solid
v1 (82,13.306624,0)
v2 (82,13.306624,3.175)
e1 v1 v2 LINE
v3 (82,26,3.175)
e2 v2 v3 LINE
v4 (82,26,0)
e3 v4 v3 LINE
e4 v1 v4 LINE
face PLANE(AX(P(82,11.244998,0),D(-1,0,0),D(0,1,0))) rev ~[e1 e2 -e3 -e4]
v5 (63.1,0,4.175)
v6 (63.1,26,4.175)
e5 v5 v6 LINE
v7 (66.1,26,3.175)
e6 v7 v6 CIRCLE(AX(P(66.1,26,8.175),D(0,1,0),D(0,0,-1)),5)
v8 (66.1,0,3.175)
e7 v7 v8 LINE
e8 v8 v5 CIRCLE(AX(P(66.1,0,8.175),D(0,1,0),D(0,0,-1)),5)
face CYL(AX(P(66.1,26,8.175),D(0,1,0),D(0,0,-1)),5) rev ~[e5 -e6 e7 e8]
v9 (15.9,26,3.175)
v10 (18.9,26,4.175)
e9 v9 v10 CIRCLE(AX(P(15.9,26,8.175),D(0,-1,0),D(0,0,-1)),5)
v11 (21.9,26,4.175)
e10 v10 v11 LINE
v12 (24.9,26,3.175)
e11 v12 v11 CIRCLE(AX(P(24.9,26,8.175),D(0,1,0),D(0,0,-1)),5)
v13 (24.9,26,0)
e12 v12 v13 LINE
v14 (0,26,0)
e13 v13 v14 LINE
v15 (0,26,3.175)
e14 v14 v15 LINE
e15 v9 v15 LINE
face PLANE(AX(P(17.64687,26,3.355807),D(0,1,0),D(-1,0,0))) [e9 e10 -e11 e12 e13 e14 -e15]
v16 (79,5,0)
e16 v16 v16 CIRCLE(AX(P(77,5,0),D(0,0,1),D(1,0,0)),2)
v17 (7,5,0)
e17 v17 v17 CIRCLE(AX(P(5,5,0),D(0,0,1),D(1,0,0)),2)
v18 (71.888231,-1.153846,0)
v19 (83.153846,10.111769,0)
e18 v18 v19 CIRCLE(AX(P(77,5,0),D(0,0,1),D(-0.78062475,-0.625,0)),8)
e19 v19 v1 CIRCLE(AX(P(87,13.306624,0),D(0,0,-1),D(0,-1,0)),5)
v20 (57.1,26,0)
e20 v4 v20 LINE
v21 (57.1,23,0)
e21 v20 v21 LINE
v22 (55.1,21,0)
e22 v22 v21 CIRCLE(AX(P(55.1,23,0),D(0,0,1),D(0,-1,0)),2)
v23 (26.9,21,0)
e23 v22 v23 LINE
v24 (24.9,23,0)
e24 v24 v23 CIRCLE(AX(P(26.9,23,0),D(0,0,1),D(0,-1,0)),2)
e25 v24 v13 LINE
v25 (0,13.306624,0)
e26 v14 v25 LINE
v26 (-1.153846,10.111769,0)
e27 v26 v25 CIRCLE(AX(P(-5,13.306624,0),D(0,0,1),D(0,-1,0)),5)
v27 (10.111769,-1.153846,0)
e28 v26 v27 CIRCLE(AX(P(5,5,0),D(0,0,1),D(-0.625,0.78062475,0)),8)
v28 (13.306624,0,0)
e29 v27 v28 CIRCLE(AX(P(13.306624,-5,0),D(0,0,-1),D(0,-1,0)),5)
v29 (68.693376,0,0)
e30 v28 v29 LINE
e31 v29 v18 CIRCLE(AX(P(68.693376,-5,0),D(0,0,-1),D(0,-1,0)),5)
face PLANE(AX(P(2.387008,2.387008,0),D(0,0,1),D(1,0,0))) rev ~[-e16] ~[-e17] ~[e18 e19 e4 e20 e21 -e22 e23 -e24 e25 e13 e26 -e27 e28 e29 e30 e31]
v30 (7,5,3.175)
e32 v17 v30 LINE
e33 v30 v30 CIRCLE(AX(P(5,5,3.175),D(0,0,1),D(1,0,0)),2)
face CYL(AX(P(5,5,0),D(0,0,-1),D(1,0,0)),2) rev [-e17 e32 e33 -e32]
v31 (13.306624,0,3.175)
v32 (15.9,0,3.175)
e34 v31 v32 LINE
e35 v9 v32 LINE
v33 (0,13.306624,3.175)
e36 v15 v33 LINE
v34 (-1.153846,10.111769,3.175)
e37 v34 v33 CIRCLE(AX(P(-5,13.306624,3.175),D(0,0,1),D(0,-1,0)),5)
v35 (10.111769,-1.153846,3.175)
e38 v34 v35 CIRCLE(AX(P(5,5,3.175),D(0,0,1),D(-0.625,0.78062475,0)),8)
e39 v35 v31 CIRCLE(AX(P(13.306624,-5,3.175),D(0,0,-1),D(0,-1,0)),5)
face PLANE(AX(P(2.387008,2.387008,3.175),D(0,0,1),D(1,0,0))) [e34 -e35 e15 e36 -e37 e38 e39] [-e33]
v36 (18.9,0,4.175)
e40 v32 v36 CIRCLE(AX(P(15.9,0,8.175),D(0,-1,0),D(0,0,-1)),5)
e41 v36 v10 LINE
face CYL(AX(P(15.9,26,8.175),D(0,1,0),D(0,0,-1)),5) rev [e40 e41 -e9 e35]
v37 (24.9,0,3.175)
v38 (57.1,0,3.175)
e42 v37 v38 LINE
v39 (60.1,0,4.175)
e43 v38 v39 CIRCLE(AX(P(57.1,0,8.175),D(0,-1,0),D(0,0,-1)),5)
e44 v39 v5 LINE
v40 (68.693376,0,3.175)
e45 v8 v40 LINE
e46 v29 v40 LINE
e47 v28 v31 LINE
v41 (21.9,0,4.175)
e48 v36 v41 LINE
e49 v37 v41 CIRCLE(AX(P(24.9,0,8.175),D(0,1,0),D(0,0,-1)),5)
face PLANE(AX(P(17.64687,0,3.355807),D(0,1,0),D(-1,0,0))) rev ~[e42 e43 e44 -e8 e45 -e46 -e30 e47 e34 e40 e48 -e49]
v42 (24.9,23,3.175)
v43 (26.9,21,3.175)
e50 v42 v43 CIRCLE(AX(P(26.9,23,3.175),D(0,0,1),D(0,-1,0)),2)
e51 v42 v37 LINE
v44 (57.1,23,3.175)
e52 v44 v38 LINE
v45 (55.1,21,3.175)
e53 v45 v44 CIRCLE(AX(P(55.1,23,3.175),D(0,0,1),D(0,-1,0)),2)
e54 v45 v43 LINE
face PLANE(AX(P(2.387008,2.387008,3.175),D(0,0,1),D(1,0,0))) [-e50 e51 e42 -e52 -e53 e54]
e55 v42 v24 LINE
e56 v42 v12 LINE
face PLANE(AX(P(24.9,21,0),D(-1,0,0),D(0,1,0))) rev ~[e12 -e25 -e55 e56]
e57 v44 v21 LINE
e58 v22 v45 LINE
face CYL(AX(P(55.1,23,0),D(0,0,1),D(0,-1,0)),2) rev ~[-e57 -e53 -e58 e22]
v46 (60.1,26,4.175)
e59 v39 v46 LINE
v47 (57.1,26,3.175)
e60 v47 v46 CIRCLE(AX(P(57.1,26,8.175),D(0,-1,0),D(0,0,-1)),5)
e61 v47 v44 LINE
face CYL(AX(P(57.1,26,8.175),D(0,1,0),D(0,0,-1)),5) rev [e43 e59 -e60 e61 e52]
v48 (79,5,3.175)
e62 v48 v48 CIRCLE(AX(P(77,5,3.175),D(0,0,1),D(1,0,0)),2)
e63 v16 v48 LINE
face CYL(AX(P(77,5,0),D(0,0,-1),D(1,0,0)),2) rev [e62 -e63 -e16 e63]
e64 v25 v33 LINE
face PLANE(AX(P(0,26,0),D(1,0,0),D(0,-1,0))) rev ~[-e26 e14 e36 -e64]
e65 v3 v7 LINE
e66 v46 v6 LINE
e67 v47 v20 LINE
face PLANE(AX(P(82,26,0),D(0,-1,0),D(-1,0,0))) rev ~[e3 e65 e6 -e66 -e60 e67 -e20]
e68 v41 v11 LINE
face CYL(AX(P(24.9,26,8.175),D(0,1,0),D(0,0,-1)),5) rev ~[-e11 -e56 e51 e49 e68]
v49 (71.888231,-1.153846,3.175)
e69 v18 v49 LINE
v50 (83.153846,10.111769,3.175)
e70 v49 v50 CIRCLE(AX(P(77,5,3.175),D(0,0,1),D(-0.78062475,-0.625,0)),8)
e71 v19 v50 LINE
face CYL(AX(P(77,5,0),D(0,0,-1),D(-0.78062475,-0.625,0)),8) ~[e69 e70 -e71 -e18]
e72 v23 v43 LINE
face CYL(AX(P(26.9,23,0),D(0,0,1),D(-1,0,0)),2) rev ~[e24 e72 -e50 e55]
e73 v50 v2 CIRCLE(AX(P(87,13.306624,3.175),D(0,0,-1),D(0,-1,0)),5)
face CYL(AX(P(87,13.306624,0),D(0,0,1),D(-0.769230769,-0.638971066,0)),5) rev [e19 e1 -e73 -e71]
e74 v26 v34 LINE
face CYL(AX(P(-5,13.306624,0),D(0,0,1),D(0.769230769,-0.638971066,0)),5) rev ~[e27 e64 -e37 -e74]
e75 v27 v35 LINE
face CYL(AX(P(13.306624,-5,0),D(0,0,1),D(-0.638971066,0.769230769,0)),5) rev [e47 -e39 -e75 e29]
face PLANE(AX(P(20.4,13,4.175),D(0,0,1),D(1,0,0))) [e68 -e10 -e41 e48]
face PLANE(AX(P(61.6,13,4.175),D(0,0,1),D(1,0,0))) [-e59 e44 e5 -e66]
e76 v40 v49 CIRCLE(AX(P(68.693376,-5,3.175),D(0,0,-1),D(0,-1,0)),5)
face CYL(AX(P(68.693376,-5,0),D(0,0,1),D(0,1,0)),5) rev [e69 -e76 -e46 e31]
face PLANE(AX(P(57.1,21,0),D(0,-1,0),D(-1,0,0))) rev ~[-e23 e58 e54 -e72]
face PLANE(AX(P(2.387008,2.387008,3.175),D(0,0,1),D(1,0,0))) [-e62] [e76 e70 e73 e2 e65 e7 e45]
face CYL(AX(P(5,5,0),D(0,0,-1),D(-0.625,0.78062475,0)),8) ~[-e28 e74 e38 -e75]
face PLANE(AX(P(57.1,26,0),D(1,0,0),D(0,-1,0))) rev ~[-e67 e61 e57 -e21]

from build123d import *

# Parameters (mm, degrees)
F0_R        = 2
F1_DEPTH    = 3.175
F2_R        = 5
F3_R        = 2
F4_W        = 3
F4_H        = 26
F5_DEPTH    = 1
F6_T1_DEPTH = 26


# Not quite as in the source:
# - a fillet or chamfer that OpenCascade refuses, or shapes differently, is made with other operations: its cross-section is extruded or revolved along the edge and cut away or added


with BuildPart() as f1:
    # F0 (on Top) → F1 (new body)
    with BuildSketch(Plane.XY):
        with BuildLine():
            Line((11.2449979984, 0), (0, 0))
            Line((0, 0), (0, 11.2449979984))
            ThreePointArc((0, 11.2449979984), (-0.6568542495, -0.6568542495), (11.2449979984, 0))
        make_face()
        Polygon((0, 11.2449979984), (0, 0), (11.2449979984, 0), (41, 0), (70.7550020016, 0), (82, 0), (82, 11.2449979984), (82, 26), (57.1, 26), (57.1, 21), (41, 21), (24.9, 21), (24.9, 26), (0, 26), align=None)
        with Locations((5, 5)):
            Circle(F0_R, mode=Mode.SUBTRACT)
        with Locations((77, 5)):
            Circle(F0_R, mode=Mode.SUBTRACT)
        with BuildLine():
            Line((82, 0), (70.7550020016, 0))
            ThreePointArc((70.7550020016, 0), (82.6568542495, -0.6568542495), (82, 11.2449979984))
            Line((82, 11.2449979984), (82, 0))
        make_face()
    extrude(amount=F1_DEPTH)

    # F2
    f2_edges = [f1.edges().sort_by_distance(p)[0] for p in [
        (11.244998, 0, 1.5875),
        (70.755002, 0, 1.5875),
        (82, 11.244998, 1.5875),
        (0, 11.244998, 1.5875),
    ]]
    fillet(f2_edges, radius=F2_R)

    # F3
    f3_edges = [f1.edges().sort_by_distance(p)[0] for p in [
        (24.9, 21, 1.5875),
        (57.1, 21, 1.5875),
    ]]
    fillet(f3_edges, radius=F3_R)

    # F4 (on face) → F5 (join)
    with BuildSketch(Plane.XY.offset(3.175)):
        with Locations((20.4, 13)):
            Rectangle(F4_W, F4_H)
        with Locations((61.6, 13)):
            Rectangle(F4_W, F4_H)
    extrude(amount=F5_DEPTH)

    # F6: fillet of radius 5 on 4 edges, made by hand

    # F6_s2 → F6_t1 (join)
    with BuildSketch(Plane.XZ.offset(-26)):
        with BuildLine():
            ThreePointArc((15.9, 3.175), (17.4811388301, 3.4315835097), (18.9, 4.175))
            Line((18.9, 4.175), (18.96, 4.095))
            ThreePointArc((18.96, 4.095), (19, 3.675), (19, 3.175))
            Line((19, 3.175), (18.9, 3.075))
            Line((18.9, 3.075), (15.9, 3.075))
            Line((15.9, 3.075), (15.9, 3.175))
        make_face()
        with BuildLine():
            ThreePointArc((24.9, 3.175), (23.3188611699, 3.4315835097), (21.9, 4.175))
            Line((21.9, 4.175), (21.84, 4.095))
            ThreePointArc((21.84, 4.095), (21.8, 3.675), (21.8, 3.175))
            Line((21.8, 3.175), (21.9, 3.075))
            Line((21.9, 3.075), (24.9, 3.075))
            Line((24.9, 3.075), (24.9, 3.175))
        make_face()
        with BuildLine():
            ThreePointArc((57.1, 3.175), (58.6811388301, 3.4315835097), (60.1, 4.175))
            Line((60.1, 4.175), (60.16, 4.095))
            ThreePointArc((60.16, 4.095), (60.2, 3.675), (60.2, 3.175))
            Line((60.2, 3.175), (60.1, 3.075))
            Line((60.1, 3.075), (57.1, 3.075))
            Line((57.1, 3.075), (57.1, 3.175))
        make_face()
        with BuildLine():
            ThreePointArc((66.1, 3.175), (64.5188611699, 3.4315835097), (63.1, 4.175))
            Line((63.1, 4.175), (63.04, 4.095))
            ThreePointArc((63.04, 4.095), (63, 3.675), (63, 3.175))
            Line((63, 3.175), (63.1, 3.075))
            Line((63.1, 3.075), (66.1, 3.075))
            Line((66.1, 3.075), (66.1, 3.175))
        make_face()
    extrude(amount=F6_T1_DEPTH)


solid = f1.part
